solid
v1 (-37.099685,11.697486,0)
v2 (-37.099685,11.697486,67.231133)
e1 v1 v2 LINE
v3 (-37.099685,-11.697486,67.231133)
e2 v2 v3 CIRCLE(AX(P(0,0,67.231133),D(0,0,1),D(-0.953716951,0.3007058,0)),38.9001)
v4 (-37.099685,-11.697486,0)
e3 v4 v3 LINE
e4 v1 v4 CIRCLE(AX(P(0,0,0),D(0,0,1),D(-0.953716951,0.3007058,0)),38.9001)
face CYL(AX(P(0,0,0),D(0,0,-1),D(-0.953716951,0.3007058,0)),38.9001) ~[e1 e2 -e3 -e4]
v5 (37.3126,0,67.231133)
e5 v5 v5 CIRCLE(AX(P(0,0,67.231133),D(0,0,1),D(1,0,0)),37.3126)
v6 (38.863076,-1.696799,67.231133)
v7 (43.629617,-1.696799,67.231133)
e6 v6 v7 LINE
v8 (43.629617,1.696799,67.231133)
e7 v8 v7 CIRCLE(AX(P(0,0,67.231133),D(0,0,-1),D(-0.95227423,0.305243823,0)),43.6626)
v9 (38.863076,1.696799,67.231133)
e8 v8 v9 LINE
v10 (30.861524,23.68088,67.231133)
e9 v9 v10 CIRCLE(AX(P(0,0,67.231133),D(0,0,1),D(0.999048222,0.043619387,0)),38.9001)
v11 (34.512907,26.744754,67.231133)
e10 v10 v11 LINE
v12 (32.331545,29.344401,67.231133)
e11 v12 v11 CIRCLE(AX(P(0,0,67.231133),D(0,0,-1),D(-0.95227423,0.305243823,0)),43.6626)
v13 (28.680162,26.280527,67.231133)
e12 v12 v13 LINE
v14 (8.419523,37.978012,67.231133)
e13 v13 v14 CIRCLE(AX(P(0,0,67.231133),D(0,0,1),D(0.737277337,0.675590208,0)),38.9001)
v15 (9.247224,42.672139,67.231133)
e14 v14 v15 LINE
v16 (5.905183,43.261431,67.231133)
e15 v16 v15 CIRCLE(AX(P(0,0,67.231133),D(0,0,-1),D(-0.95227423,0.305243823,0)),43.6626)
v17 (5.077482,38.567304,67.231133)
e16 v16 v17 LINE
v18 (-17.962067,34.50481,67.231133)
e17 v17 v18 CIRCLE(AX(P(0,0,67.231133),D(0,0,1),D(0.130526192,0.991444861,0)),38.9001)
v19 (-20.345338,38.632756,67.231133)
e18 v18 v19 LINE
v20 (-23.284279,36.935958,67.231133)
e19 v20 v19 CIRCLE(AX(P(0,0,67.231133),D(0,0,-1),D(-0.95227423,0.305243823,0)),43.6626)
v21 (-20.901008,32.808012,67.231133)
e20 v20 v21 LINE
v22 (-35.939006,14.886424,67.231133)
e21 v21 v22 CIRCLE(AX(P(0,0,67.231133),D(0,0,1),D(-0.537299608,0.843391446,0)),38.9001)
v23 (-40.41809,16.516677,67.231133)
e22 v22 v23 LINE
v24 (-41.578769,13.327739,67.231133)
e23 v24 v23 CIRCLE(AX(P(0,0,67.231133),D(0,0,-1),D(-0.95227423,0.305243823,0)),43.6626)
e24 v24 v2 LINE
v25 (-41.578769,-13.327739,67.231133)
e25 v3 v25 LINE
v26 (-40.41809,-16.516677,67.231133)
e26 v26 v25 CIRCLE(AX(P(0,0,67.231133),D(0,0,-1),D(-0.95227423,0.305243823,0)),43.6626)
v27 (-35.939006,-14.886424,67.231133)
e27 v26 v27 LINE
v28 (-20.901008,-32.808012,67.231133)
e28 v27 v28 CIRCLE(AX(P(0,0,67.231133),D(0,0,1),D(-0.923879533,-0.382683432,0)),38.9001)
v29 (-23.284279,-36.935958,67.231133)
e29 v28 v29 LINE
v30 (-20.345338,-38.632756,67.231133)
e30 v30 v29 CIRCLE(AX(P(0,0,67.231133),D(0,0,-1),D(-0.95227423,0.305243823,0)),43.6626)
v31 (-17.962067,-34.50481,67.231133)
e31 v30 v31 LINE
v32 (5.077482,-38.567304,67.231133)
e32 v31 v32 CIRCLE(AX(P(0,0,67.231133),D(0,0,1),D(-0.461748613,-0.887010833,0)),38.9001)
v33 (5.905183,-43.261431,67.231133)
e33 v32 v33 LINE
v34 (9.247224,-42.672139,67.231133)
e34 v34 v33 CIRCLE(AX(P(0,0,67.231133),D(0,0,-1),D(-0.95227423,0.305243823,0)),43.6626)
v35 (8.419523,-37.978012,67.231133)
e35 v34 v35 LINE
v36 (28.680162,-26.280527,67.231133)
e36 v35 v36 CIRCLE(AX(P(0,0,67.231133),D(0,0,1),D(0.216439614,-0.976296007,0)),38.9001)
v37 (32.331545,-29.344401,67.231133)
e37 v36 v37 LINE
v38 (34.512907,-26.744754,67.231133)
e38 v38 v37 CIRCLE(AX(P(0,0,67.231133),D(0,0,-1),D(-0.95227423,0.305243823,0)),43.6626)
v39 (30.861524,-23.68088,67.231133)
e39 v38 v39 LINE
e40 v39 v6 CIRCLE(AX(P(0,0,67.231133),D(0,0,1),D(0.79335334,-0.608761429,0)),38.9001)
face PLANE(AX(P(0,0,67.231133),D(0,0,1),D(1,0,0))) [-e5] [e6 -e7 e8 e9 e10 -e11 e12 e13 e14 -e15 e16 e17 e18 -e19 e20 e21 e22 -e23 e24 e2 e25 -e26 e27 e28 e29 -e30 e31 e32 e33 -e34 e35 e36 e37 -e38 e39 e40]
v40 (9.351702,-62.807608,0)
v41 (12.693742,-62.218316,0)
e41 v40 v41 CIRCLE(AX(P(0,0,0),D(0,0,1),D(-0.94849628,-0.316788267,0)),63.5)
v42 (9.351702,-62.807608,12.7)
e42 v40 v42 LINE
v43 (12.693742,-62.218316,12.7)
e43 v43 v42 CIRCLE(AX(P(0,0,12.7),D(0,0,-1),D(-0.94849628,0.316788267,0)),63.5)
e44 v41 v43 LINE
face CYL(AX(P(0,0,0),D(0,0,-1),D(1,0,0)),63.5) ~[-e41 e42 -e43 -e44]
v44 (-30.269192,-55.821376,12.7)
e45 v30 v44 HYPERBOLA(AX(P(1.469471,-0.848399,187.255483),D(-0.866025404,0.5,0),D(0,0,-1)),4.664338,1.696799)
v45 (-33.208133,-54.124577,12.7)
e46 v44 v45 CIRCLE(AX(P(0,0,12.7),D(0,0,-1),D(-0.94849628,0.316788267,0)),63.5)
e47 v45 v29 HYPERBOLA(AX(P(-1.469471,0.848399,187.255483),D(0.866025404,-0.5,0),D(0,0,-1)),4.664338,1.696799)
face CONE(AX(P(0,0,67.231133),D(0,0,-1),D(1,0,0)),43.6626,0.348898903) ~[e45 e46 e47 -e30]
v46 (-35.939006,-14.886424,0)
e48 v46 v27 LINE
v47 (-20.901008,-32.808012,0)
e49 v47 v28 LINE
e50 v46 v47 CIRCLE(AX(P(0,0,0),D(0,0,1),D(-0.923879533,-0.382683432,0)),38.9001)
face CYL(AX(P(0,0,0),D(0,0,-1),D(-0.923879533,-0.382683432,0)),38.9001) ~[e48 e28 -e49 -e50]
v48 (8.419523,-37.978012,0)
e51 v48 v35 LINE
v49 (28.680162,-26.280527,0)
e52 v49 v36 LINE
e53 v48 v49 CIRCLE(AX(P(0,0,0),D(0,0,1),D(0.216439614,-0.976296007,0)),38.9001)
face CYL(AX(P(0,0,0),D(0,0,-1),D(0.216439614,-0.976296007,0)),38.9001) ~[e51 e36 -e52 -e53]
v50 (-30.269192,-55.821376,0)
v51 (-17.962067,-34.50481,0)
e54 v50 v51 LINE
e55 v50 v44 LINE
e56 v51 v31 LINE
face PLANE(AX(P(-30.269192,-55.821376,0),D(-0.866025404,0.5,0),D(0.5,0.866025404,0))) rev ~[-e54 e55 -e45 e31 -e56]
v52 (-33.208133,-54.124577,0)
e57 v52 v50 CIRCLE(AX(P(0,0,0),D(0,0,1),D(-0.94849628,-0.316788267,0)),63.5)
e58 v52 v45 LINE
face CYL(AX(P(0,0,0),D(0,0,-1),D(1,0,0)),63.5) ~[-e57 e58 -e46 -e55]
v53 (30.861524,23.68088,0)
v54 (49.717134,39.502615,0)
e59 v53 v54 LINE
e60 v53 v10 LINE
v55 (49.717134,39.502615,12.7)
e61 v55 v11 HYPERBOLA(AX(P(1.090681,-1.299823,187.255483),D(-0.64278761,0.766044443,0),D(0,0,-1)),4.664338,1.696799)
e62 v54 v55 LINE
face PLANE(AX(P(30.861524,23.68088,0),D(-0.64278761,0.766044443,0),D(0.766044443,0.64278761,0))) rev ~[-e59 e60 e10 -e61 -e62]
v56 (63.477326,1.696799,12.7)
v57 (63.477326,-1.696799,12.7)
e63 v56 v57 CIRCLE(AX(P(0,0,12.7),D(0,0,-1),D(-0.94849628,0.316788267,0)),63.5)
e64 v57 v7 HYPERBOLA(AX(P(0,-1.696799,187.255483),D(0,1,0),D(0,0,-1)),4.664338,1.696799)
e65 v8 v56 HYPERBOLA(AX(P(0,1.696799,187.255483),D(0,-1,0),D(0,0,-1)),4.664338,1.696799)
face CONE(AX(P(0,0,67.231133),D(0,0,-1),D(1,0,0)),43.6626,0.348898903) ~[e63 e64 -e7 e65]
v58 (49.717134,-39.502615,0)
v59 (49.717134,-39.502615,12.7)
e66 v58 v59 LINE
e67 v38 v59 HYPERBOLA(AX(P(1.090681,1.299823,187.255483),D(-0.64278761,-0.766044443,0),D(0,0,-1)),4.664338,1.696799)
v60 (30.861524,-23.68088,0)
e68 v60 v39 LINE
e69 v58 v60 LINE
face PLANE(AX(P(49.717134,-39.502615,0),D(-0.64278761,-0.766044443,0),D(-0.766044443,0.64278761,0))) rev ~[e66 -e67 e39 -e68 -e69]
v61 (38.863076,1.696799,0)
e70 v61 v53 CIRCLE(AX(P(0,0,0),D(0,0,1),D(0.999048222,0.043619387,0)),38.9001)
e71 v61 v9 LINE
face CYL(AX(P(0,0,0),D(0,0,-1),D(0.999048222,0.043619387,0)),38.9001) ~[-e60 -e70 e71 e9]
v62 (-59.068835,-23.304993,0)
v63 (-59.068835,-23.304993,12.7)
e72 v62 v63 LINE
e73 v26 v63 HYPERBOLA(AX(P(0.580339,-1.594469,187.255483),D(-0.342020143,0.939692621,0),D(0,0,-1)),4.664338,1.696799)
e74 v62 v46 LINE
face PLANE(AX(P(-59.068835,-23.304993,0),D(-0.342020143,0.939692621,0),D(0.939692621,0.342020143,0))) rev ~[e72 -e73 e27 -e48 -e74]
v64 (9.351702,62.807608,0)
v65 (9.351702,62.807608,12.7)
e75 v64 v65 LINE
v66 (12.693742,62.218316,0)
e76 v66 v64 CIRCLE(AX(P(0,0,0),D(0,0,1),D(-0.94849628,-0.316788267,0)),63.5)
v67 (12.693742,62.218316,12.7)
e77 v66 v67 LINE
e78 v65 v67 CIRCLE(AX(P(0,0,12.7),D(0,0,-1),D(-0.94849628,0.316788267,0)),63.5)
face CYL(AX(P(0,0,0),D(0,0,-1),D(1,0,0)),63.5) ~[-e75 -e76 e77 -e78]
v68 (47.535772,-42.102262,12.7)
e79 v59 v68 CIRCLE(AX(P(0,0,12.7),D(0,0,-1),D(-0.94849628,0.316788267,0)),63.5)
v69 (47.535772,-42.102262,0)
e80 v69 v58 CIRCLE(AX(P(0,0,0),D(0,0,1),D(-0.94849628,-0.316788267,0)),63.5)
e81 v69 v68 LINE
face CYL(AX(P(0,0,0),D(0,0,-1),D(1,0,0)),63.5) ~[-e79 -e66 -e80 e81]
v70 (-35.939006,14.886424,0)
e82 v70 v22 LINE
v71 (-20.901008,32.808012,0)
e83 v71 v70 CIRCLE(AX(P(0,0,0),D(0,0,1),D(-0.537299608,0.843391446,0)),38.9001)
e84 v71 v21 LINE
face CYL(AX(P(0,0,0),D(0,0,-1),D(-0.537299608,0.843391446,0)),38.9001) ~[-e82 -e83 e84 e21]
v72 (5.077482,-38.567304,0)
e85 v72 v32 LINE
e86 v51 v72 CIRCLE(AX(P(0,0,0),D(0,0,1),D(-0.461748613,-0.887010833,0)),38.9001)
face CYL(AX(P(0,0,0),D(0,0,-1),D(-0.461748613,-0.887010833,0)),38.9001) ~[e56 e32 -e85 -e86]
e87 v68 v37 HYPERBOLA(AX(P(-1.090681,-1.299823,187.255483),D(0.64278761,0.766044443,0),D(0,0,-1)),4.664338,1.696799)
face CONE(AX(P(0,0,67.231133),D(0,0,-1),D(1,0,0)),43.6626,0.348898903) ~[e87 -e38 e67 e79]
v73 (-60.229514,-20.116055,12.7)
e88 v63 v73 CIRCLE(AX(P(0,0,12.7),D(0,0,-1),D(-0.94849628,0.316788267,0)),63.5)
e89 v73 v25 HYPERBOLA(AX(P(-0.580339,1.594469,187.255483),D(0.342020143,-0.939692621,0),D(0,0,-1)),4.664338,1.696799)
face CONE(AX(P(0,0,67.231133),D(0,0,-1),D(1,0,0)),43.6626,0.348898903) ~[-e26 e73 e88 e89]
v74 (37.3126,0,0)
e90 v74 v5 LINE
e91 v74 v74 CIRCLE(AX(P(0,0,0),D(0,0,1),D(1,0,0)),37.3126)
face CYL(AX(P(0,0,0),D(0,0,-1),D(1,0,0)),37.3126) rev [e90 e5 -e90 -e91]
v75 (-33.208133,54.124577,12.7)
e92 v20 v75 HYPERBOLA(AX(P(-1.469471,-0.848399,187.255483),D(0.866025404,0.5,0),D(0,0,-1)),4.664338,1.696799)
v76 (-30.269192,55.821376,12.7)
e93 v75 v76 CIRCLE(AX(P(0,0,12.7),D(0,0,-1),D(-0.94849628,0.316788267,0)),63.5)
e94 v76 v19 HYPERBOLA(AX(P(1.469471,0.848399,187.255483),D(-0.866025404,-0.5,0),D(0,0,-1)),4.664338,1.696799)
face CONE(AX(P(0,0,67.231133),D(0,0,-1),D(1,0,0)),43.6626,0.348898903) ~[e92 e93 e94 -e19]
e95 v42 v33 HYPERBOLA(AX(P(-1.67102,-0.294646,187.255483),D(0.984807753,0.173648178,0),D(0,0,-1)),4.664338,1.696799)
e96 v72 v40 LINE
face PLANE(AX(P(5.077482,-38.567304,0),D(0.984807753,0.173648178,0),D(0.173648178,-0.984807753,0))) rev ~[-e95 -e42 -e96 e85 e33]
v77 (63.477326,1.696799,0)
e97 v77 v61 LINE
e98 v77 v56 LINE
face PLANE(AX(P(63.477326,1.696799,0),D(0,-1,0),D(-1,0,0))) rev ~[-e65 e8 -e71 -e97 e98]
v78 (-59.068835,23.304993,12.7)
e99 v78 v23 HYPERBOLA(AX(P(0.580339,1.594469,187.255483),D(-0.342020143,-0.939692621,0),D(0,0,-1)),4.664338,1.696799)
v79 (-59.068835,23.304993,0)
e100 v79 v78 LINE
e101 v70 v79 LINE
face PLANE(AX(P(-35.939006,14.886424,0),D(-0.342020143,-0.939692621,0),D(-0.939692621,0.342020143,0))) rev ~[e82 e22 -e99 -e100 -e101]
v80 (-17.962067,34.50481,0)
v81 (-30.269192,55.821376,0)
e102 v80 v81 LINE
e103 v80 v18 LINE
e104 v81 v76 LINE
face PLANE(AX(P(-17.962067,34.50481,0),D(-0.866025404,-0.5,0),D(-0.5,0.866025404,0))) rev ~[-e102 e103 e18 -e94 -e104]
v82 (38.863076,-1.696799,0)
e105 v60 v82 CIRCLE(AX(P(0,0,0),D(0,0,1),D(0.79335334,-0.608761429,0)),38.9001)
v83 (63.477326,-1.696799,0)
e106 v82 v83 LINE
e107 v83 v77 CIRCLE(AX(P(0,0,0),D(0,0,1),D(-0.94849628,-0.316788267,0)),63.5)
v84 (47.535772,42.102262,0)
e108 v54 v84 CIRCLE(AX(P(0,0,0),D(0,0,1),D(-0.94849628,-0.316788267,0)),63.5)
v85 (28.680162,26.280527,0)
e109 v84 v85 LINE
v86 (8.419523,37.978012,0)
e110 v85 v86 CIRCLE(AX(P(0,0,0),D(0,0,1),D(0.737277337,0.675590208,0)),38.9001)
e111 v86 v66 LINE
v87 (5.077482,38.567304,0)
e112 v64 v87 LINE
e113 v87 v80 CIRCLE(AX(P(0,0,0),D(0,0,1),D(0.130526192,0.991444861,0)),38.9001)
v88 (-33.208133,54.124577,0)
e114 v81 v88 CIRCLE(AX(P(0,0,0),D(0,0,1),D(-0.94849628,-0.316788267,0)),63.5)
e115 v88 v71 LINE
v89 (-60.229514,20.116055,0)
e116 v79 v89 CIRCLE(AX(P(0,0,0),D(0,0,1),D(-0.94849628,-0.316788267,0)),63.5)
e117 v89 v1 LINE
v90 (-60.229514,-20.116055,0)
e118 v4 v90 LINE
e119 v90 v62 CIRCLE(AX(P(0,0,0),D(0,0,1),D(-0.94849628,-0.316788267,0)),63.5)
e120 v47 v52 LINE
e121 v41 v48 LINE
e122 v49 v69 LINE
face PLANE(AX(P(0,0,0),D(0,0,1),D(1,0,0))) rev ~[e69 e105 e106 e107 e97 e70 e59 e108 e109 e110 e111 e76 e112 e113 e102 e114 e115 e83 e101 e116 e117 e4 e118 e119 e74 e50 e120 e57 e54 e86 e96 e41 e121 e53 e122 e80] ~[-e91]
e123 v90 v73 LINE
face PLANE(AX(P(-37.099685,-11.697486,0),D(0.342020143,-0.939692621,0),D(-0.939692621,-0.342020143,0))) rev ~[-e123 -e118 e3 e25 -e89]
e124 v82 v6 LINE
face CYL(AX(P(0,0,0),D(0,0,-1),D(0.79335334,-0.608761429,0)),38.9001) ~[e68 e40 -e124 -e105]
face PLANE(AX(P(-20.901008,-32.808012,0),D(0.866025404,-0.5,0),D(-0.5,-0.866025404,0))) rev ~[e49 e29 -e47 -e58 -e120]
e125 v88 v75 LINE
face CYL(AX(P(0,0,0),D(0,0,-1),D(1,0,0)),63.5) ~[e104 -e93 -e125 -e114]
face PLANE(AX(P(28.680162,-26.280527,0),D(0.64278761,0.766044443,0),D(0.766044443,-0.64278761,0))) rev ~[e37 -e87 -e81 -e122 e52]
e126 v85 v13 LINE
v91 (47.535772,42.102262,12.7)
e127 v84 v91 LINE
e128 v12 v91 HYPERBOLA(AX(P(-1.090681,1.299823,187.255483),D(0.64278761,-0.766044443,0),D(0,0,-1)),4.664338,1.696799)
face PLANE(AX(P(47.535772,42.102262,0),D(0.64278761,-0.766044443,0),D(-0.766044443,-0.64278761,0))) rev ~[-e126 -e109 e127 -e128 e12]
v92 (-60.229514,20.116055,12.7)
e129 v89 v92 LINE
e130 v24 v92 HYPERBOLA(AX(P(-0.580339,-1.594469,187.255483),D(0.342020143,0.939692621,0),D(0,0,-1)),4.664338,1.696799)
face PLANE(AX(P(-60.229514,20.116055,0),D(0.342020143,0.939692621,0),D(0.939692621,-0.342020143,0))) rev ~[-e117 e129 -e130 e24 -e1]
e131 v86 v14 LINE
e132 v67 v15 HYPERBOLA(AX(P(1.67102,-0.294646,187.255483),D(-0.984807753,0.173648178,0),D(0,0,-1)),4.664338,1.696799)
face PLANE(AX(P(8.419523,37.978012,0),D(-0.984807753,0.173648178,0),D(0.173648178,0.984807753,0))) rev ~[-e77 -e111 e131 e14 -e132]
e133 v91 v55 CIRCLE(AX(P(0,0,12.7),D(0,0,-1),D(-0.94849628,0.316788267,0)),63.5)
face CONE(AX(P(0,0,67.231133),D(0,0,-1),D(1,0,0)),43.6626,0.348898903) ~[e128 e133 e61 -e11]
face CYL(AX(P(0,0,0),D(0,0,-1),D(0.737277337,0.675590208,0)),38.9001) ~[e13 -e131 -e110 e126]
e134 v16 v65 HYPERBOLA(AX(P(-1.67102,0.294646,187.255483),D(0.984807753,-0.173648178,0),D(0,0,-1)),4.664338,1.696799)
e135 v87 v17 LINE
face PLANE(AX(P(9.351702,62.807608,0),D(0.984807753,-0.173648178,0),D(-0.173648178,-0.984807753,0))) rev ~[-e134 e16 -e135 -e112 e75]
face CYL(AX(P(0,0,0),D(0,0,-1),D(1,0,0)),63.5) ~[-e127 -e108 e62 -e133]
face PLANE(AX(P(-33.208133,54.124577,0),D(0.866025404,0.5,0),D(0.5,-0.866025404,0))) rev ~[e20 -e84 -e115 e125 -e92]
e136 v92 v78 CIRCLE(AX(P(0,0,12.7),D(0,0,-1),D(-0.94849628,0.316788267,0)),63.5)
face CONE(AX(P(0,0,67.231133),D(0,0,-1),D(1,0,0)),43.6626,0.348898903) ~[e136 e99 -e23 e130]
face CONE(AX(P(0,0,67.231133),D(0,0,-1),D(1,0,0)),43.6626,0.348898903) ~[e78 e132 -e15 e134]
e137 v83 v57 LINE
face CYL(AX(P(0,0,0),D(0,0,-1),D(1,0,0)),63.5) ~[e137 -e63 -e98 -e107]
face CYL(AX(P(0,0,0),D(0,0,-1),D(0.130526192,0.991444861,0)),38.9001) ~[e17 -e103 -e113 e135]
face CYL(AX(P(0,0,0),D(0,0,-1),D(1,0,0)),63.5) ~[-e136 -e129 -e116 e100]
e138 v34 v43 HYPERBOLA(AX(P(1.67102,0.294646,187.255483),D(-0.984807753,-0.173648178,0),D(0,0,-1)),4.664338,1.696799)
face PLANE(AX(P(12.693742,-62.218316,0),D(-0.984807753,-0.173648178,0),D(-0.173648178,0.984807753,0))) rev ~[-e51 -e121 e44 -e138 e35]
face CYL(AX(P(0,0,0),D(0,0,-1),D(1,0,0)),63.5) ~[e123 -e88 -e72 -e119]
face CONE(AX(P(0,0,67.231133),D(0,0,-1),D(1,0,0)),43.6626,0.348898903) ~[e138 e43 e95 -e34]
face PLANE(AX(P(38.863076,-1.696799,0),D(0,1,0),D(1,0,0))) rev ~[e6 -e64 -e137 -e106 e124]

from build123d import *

# Parameters (mm, degrees)
F0_R            = 63.5
F0_R_2          = 37.3126
F1_DEPTH        = 67.231133
F5_DEPTH        = 67.231133
F5_COPIES_COUNT = 9
F6_COUNT        = 9
F6_ANGLE        = 320


# Not quite as in the source:
# - a pattern or mirror of a feature is missing from the dataset's text; its kind, count and spacing are read off the source's solid


with BuildPart() as f1:
    # F0 (on Top) → F1 (new body)
    with BuildSketch(Plane.XY):
        Circle(F0_R)
        Circle(F0_R_2, mode=Mode.SUBTRACT)
    extrude(amount=F1_DEPTH)

    # F2 (on Front) → F3 (revolve, cut)
    with BuildSketch(Plane.XZ):
        Polygon((43.6626, 110.893733), (43.6626, 67.231133), (63.5, 12.7), (63.5, 0), (107.1626, 0), (107.1626, 110.893733), align=None)
    revolve(axis=Axis((0, 0, 67.231133), (0, 0, 1)), mode=Mode.SUBTRACT)

    # F4 (on face) → F5 (cut, through all)
    with BuildSketch(Plane(origin=(0, 0, 0), x_dir=(1, 0, 0), z_dir=(0, 0, -1))):
        with BuildLine():
            ThreePointArc((-37.0996847558, -11.6974856713), (-38.9001, 0), (-37.0996847558, 11.6974856713))
            Line((-37.0996847558, 11.6974856713), (-60.2295137998, 20.116054967))
            ThreePointArc((-60.2295137998, 20.116054967), (-63.5, 0), (-60.2295137998, -20.116054967))
            Line((-60.2295137998, -20.116054967), (-37.0996847558, -11.6974856713))
        make_face()
    f5 = extrude(amount=-F5_DEPTH, mode=Mode.SUBTRACT)

    # F5_copies: F5 ×9 about axis
    f5_copies_axis = Axis((0, 0, 0), (0, 0, 1))
    for i in range(1, F5_COPIES_COUNT):
        add(f5.rotate(f5_copies_axis, i * 360 / F5_COPIES_COUNT), mode=Mode.SUBTRACT)

    # F6: F5 ×9 about axis
    f6_axis = Axis((0, 0, 67.231133), (0, 0, -1))
    for i in range(1, F6_COUNT):
        add(f5.rotate(f6_axis, i * F6_ANGLE / (F6_COUNT - 1)), mode=Mode.SUBTRACT)


solid = f1.part
